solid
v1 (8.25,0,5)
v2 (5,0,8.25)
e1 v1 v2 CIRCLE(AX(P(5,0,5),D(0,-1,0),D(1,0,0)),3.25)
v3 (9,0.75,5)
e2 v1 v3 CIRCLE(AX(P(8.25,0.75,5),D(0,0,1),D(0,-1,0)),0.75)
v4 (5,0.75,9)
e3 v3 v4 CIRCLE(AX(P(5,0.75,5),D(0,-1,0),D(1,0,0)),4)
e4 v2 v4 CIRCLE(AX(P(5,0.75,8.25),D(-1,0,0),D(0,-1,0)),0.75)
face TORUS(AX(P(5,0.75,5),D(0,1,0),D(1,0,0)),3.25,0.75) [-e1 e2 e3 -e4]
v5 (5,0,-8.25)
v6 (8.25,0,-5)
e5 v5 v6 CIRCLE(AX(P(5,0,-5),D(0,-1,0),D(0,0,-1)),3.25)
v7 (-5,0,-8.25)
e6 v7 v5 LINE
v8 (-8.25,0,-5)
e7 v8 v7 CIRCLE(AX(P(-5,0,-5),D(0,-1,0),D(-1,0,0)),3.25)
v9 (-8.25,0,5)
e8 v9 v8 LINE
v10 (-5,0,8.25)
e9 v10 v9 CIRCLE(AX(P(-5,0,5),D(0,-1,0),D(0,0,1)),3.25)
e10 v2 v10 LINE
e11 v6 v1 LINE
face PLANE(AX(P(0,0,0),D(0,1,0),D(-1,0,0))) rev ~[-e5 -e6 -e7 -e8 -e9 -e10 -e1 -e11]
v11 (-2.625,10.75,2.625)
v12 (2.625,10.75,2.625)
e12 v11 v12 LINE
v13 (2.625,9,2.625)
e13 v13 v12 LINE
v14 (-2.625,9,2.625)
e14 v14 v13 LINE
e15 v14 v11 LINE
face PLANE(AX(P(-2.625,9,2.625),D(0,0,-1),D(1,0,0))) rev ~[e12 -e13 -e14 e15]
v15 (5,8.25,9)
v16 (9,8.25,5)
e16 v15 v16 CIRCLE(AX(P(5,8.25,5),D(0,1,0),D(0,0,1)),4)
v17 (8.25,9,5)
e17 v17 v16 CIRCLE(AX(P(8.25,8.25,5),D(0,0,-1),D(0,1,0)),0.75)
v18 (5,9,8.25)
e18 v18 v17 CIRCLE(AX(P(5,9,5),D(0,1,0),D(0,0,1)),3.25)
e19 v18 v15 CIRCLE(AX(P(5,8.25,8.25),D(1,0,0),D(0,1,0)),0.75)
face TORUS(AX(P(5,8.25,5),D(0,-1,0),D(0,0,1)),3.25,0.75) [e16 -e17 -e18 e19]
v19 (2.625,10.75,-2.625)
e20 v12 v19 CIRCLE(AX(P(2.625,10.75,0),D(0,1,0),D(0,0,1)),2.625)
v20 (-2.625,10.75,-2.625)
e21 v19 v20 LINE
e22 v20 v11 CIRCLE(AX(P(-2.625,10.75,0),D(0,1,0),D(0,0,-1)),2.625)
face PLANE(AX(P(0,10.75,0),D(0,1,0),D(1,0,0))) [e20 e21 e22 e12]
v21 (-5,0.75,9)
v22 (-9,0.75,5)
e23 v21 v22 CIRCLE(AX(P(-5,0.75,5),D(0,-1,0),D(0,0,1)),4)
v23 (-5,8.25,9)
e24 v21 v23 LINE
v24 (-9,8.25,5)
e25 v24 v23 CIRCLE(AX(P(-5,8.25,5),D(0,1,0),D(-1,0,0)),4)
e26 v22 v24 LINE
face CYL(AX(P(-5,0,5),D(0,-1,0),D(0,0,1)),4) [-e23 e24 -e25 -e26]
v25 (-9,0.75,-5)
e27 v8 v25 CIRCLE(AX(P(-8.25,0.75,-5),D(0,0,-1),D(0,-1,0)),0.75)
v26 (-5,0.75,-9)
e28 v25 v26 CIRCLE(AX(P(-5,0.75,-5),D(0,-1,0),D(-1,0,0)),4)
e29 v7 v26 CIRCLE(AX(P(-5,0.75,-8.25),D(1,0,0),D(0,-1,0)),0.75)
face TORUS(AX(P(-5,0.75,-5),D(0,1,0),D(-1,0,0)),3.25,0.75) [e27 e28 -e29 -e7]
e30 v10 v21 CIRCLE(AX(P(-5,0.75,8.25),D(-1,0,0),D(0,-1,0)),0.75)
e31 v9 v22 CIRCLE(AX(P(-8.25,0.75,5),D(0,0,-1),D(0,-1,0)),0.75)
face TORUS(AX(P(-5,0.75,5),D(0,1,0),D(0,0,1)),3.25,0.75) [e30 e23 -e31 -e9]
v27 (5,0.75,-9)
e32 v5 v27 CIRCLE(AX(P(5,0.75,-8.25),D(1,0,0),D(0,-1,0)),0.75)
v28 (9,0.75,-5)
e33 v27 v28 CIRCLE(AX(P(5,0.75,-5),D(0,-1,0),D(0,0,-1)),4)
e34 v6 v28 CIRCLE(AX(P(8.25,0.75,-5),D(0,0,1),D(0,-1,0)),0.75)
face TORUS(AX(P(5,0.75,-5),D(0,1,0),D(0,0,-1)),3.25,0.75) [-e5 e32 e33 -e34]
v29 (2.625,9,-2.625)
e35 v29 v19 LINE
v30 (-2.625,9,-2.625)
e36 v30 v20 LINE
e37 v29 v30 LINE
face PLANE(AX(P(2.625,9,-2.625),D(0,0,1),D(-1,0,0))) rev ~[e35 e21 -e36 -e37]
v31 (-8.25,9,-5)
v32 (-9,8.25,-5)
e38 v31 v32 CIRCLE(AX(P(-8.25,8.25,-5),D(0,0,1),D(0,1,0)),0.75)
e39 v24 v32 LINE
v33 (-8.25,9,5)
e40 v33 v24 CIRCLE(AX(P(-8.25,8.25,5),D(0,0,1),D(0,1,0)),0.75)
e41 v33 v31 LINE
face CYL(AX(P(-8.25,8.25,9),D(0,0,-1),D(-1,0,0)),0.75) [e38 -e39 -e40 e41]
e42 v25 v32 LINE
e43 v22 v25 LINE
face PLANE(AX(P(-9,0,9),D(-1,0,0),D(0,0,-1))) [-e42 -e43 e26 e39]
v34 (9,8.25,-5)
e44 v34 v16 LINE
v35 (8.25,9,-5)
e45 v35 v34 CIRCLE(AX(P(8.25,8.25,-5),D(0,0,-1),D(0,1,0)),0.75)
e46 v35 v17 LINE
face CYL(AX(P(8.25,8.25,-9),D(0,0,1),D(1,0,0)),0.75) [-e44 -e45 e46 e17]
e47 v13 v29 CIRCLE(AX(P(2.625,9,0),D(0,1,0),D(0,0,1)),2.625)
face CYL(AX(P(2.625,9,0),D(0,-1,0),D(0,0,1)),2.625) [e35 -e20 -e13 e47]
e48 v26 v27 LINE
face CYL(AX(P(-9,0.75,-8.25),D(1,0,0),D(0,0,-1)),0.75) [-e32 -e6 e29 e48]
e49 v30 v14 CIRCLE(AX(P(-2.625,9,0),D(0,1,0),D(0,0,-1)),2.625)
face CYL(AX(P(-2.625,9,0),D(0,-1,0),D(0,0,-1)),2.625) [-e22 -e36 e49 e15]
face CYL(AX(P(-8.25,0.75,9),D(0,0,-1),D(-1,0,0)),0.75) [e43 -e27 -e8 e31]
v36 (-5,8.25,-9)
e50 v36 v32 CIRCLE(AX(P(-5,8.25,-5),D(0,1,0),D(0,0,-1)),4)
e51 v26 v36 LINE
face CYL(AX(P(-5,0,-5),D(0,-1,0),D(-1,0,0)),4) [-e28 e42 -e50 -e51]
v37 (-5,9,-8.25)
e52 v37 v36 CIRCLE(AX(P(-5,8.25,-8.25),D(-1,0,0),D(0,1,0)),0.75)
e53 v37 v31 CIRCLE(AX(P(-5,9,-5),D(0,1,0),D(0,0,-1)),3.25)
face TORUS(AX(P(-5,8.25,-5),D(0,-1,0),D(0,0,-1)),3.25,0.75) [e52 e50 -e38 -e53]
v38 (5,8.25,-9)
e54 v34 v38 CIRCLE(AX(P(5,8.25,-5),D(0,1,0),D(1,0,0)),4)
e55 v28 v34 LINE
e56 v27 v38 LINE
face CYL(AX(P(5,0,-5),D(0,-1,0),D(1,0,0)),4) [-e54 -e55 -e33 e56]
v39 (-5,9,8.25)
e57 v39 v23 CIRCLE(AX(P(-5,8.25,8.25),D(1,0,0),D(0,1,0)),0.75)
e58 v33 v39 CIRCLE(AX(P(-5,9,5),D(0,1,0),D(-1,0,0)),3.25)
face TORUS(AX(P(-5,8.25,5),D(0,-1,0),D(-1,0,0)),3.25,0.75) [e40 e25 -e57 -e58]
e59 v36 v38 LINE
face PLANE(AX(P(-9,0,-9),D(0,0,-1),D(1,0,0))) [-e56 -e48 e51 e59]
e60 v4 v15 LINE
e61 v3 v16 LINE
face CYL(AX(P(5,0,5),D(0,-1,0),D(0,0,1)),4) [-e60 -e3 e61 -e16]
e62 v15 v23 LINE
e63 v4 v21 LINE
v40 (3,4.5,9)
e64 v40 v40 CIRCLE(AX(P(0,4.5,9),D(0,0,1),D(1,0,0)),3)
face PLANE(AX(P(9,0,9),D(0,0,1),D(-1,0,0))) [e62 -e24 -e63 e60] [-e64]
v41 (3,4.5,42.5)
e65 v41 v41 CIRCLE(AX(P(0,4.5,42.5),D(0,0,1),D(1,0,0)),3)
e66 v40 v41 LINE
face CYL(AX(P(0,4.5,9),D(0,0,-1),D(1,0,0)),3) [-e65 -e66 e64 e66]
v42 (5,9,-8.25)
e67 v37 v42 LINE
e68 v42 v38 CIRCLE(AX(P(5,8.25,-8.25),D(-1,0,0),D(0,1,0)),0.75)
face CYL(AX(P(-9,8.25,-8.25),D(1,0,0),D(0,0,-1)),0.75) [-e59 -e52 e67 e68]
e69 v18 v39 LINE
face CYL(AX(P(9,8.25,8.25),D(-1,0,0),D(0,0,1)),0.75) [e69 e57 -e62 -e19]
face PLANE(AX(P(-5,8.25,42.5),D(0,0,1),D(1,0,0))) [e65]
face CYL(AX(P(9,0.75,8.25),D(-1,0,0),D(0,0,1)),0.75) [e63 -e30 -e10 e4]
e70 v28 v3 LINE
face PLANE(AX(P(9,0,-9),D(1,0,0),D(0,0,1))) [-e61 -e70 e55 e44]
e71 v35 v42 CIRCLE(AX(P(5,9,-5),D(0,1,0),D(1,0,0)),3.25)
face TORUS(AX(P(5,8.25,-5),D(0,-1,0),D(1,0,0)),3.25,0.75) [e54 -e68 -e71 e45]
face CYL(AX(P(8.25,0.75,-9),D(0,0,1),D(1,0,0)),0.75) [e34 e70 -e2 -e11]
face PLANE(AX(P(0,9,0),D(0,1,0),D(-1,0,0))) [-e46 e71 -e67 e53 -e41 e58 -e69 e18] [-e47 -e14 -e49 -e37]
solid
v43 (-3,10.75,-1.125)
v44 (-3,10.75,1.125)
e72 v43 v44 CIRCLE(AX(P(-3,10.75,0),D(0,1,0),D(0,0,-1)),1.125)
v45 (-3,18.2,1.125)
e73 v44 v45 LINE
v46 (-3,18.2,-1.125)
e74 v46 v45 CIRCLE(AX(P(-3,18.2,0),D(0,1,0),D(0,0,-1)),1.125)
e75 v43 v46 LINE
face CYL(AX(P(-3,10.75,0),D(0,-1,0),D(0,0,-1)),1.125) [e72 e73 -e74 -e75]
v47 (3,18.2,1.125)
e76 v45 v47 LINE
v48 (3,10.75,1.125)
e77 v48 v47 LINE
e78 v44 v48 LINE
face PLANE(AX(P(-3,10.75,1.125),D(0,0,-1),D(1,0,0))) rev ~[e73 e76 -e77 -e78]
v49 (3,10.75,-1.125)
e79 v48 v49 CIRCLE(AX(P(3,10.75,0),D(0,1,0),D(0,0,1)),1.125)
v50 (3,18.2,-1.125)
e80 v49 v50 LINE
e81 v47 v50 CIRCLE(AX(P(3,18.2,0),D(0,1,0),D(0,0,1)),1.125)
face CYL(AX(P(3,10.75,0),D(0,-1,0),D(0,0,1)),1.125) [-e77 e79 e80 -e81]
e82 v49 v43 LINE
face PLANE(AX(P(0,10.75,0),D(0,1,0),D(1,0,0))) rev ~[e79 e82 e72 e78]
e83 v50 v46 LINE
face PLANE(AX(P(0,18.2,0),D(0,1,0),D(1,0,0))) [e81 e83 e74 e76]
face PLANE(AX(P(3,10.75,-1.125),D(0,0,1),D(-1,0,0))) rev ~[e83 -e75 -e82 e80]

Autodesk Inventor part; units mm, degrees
ref_plane "YZ Plane" through (0, 0, 0) normal (1, 0, 0) x (0, 1, 0)
ref_plane "XZ Plane" through (0, 0, 0) normal (0, 1, 0) x (-1, 0, 0)
ref_plane "XY Plane" through (0, 0, 0) normal (0, 0, 1) x (1, 0, 0)
sketch "Sketch1" plane through (0, 0, 0) normal (0, 1, 0) x (-1, 0, 0)
  line L0 (-9, 9) -> (9, 9)
  line L1 (9, 9) -> (9, -9)
  line L2 (9, -9) -> (-9, -9)
  line L3 (-9, -9) -> (-9, 9)
  line L4 (-9, 9) -> (9, -9) construction
  line L5 (9, 9) -> (-9, -9) construction
  point P0 (0, 0)
  dimension "d0" = 18
  dimension "d1" = 18
extrude "Extrusion1" add sketch "Sketch1" along normal blind 9
fillet "Fillet1" radius 0.75 8 edges at (0, 9, 9) (9, 9, 0) (0, 9, -9) (-9, 9, 0) (0, 0, 9) (-9, 0, 0) (0, 0, -9) (9, 0, 0)
fillet "Fillet2" radius 4 12 edges at (-8.7803, 8.7803, 8.7803) (-8.7803, 0.2197, 8.7803) (-9, 4.5, 9) (8.7803, 8.7803, 8.7803) (8.7803, 0.2197, 8.7803) (9, 4.5, 9) (8.7803, 8.7803, -8.7803) (8.7803, 0.2197, -8.7803) (9, 4.5, -9) (-8.7803, 8.7803, -8.7803) (-8.7803, 0.2197, -8.7803) (-9, 4.5, -9)
sketch "Sketch2" plane through (0, 9, 0) normal (0, 1, 0) x (1, 0, 0)
  line L0 (0, 0) -> (-5.25, 0) construction
  line L1 (-5.25, 0) -> (5.25, 0) construction
  line L2 (-2.625, -2.625) -> (2.625, -2.625)
  line L3 (2.625, 2.625) -> (-2.625, 2.625)
  arc A0 (-2.625, 2.625) -> (-2.625, -2.625) centre (-2.625, 0) ccw
  arc A1 (2.625, -2.625) -> (2.625, 2.625) centre (2.625, 0) ccw
  dimension "d6" = 5.25
  dimension "d7" = 10.5
  dimension "d8" = 5.25
extrude "Extrusion2" add sketch "Sketch2" along normal blind 1.75
sketch "Sketch3" plane through (0, 10.75, 0) normal (0, 1, 0) x (1, 0, 0)
  line L0 (0, 0) -> (-4.125, 0) construction
  line L1 (-4.125, 0) -> (4.125, 0) construction
  line L2 (-3, -1.125) -> (3, -1.125)
  line L3 (3, 1.125) -> (-3, 1.125)
  arc A0 (-3, 1.125) -> (-3, -1.125) centre (-3, 0) ccw
  arc A1 (3, -1.125) -> (3, 1.125) centre (3, 0) ccw
  dimension "d11" = 4.125
  dimension "d12" = 8.25
  dimension "d13" = 2.25
extrude "Extrusion3" add sketch "Sketch3" along normal blind 7.45 separate body
sketch "Sketch4" plane through (-5, 8.25, 9) normal (0, 0, 1) x (1, 0, 0)
  line L0 (10, 0) -> (10, -7.5) construction
  line L1 (0, 0) -> (10, 0) construction
  line L2 (0, -7.5) -> (0, 0) construction
  line L3 (10, -7.5) -> (0, -7.5) construction
  line L4 (10, -7.5) -> (0, -7.5) construction
  line L5 (5, -7.5) -> (5, 0) construction
  circle A0 centre (5, -3.75) radius 3
  point P0 (5, -8.25)
  dimension "d16" = 6
extrude "Extrusion4" add sketch "Sketch4" along normal blind 33.5 bodies 1
equation "\"d7\" = 2 * d6"
equation "\"d8\" = d6"
properties part number "USB C Right Angle Plug"
